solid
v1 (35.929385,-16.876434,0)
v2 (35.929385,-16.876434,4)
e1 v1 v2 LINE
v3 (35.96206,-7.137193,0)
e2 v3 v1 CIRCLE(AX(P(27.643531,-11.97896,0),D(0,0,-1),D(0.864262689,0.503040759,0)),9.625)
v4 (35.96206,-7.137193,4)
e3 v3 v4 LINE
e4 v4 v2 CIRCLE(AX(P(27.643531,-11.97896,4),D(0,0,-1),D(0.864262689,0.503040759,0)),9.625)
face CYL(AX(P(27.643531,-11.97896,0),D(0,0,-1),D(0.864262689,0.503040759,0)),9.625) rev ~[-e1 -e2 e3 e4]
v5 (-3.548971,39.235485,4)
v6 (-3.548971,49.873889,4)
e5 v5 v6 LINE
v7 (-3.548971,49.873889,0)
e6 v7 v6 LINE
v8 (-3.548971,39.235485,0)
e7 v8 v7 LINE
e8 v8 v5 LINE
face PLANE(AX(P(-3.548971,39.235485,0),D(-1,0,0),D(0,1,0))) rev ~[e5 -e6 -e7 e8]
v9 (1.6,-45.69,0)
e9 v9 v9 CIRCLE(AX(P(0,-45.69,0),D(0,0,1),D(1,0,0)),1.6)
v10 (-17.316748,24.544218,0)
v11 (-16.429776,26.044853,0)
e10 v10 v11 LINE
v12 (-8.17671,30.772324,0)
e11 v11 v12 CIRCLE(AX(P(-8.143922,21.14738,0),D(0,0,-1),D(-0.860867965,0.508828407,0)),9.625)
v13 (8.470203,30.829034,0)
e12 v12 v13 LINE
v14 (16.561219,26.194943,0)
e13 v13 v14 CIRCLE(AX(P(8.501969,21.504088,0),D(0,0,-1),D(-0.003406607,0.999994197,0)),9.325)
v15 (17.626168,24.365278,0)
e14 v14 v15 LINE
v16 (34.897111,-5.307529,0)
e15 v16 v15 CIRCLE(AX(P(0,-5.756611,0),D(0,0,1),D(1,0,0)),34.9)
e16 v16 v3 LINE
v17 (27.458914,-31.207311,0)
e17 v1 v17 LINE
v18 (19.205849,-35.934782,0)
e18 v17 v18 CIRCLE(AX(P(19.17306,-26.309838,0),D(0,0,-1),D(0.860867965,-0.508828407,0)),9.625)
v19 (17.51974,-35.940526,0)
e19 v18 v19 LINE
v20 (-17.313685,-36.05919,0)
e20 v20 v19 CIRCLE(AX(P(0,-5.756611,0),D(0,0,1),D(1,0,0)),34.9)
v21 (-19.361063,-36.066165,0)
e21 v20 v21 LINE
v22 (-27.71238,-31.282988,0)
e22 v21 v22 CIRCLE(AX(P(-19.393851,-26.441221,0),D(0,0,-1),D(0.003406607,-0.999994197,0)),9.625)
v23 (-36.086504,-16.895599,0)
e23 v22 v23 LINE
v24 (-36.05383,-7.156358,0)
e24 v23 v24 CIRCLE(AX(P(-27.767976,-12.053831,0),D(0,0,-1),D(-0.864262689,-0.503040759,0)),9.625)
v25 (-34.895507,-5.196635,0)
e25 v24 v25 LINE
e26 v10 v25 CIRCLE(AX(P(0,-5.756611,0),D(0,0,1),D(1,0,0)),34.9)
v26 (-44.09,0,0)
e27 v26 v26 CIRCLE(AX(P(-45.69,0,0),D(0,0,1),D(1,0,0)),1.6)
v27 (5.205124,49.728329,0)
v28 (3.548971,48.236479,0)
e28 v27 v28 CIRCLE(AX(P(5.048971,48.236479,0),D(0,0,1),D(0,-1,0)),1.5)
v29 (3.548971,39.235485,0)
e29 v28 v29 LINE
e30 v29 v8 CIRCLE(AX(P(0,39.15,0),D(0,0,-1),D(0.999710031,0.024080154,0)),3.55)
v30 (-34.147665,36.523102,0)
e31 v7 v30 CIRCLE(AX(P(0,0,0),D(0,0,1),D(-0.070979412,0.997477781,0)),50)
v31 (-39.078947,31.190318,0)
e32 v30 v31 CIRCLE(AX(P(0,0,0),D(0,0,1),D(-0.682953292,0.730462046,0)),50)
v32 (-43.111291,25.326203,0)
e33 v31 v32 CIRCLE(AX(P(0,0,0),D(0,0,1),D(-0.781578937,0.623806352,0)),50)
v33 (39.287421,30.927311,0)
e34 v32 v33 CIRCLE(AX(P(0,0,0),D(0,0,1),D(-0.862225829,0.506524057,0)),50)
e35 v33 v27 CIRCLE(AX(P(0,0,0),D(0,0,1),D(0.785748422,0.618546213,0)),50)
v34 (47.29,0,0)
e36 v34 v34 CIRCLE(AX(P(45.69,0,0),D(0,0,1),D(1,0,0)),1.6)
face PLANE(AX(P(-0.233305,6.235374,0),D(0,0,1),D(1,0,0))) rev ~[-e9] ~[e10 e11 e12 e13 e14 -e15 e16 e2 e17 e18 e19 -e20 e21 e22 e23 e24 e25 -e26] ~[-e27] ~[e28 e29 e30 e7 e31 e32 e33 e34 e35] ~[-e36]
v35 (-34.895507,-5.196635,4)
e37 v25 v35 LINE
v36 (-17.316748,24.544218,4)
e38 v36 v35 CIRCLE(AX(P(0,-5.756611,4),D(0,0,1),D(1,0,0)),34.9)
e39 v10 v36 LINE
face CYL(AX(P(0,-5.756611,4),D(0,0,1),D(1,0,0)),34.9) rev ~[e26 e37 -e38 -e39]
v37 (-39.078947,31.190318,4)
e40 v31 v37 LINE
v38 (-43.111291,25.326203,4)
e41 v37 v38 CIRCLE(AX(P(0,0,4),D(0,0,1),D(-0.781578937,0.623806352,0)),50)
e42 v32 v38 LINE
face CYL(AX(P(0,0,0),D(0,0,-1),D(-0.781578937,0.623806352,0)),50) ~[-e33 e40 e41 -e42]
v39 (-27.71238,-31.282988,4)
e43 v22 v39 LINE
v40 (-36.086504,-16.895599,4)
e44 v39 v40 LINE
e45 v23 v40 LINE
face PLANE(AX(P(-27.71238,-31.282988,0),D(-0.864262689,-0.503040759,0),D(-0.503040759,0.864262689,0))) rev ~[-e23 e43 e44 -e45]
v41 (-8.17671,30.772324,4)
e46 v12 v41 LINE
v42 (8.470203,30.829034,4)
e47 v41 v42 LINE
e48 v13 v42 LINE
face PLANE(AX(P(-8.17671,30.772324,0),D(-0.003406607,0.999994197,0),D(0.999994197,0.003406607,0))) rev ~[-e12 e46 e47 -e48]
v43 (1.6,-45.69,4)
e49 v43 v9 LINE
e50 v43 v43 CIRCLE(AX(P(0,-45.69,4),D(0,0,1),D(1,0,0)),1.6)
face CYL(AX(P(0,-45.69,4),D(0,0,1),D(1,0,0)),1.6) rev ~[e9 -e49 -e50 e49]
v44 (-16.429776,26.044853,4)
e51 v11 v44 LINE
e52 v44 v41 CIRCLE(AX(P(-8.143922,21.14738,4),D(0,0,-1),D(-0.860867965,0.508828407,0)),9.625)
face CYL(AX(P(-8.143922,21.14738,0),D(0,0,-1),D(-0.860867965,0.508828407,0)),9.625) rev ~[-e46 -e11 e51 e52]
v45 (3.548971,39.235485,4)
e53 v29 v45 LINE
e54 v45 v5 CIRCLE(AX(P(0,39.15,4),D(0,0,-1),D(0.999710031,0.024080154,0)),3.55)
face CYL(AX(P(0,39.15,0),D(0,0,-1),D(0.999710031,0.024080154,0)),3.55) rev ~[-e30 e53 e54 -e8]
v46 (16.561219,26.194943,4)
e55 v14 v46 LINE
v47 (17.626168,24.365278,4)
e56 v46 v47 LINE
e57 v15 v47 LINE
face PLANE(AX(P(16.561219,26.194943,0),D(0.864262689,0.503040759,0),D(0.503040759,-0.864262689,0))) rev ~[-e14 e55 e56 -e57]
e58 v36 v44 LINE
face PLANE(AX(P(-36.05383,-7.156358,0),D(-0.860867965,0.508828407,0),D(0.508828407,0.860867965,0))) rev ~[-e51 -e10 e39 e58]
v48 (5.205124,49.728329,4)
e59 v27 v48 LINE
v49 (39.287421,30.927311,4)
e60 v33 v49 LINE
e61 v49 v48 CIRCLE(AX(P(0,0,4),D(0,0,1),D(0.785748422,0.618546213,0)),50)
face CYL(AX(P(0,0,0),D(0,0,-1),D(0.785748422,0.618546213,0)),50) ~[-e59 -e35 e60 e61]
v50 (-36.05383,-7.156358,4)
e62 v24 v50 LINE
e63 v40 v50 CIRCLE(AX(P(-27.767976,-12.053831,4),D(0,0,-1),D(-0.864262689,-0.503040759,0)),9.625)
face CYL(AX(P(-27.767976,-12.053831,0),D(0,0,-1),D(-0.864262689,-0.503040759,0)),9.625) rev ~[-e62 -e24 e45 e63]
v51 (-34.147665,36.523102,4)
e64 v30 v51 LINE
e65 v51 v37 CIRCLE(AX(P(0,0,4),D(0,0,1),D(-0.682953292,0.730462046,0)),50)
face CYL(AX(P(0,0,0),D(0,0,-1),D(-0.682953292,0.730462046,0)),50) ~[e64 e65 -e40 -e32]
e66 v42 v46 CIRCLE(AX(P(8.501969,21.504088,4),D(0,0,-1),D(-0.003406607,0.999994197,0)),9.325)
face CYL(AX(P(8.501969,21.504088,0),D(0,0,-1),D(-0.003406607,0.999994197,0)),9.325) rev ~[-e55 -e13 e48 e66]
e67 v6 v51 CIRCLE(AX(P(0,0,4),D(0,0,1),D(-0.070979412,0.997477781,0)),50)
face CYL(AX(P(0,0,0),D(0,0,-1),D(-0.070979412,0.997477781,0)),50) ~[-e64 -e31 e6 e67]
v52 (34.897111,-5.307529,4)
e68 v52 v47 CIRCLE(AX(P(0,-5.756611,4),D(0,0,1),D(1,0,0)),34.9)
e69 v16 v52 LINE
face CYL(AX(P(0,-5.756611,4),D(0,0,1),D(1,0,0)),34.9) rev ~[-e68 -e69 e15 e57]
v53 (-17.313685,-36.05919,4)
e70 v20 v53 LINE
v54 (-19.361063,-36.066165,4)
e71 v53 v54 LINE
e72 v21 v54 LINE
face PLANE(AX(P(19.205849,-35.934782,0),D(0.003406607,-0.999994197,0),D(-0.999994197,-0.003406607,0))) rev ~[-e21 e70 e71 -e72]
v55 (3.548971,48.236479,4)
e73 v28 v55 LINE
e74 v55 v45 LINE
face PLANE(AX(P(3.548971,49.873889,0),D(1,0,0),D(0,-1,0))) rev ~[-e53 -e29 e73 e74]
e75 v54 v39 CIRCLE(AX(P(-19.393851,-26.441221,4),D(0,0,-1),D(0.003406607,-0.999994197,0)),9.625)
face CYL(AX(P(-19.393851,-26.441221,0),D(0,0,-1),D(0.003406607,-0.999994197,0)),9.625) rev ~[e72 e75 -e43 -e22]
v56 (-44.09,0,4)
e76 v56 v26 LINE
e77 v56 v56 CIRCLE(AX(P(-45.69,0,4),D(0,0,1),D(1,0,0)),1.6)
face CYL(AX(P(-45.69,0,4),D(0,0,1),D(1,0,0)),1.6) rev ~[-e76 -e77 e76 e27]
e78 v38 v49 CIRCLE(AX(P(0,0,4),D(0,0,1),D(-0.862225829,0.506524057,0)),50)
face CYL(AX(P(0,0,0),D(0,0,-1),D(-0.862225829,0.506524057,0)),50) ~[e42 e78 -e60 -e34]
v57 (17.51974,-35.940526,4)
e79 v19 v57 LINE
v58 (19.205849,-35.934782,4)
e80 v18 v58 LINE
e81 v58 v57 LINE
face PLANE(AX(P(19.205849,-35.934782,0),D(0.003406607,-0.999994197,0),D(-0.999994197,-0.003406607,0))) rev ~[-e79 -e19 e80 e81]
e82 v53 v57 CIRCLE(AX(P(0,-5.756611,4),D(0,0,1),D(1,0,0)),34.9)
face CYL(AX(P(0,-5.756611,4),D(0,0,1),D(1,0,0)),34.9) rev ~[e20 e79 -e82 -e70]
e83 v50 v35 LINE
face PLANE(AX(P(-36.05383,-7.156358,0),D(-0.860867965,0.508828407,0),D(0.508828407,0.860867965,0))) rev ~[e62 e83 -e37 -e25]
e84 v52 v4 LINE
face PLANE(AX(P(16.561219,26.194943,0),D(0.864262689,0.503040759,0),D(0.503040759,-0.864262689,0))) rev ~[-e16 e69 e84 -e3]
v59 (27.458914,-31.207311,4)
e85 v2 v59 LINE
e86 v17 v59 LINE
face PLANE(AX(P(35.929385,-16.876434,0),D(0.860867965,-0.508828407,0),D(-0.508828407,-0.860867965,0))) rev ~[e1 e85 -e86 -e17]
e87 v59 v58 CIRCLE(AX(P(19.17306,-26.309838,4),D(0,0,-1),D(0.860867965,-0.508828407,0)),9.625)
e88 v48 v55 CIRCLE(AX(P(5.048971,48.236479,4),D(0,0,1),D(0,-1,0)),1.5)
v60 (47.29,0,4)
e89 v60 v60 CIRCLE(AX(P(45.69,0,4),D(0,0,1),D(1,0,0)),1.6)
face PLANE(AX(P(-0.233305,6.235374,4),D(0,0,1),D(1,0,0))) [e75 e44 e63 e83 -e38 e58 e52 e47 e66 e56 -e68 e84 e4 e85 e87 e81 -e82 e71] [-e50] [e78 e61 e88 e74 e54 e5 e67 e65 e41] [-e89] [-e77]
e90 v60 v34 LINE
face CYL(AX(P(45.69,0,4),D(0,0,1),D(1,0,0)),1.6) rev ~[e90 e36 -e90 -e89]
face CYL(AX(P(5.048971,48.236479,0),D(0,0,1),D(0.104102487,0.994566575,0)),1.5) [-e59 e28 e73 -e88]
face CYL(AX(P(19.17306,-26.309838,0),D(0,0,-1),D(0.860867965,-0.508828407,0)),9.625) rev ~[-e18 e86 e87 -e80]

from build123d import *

# Parameters (mm, degrees)
F1_DEPTH = 4
F2_R     = 1.5
F3_R     = 1.6
F4_DEPTH = 4.001
F5_R     = 34.9
F6_DEPTH = 4.001


# Not quite as in the source:
# - a feature names something its author has since deleted; it is built from what else it names


with BuildPart() as f1:
    # F0 (on Top) → F1 (new body)
    with BuildSketch(Plane.XY):
        with BuildLine():
            ThreePointArc((-39.0789468534, 31.1903176135), (-41.1995846792, 28.3300939331), (-43.1112914302, 25.3262028584))
            ThreePointArc((-43.1112914302, 25.3262028584), (3.3909583102, -49.8848814947), (39.2874210825, 30.9273106604))
            ThreePointArc((39.2874210825, 30.9273106604), (23.4196994292, 44.1759853161), (3.5489706102, 49.8738890363))
            Line((3.5489706102, 49.8738890363), (3.5489706102, 39.2354845469))
            ThreePointArc((3.5489706102, 39.2354845469), (0, 35.6), (-3.5489706102, 39.2354845469))
            Line((-3.5489706102, 39.2354845469), (-3.5489706102, 49.8738890363))
            ThreePointArc((-3.5489706102, 49.8738890363), (-19.9954983208, 45.8277213802), (-34.1476646001, 36.5231023102))
            ThreePointArc((-34.1476646001, 36.5231023102), (-36.7102683781, 33.9463723482), (-39.0789468534, 31.1903176135))
        make_face()
        with BuildLine():
            Line((-36.0538297274, -7.1563580217), (-16.4297758662, 26.0448529843))
            ThreePointArc((-16.4297758662, 26.0448529843), (-12.9279784785, 29.4992312077), (-8.176710299, 30.7723237188))
            Line((-8.176710299, 30.7723237188), (8.4702026349, 30.8290335362))
            ThreePointArc((8.4702026349, 30.8290335362), (13.1364940427, 29.5958615472), (16.5612188168, 26.1949427186))
            Line((16.5612188168, 26.1949427186), (35.9620596652, -7.1371930753))
            ThreePointArc((35.9620596652, -7.1371930753), (37.2684771199, -12.0112511492), (35.9293854445, -16.8764337932))
            Line((35.9293854445, -16.8764337932), (27.4589141067, -31.2073110011))
            ThreePointArc((27.4589141067, -31.2073110011), (23.957116719, -34.6616892246), (19.2058485395, -35.9347817357))
            Line((19.2058485395, -35.9347817357), (-19.3610626759, -36.0661648035))
            ThreePointArc((-19.3610626759, -36.0661648035), (-24.1774760593, -34.793319721), (-27.7123796465, -31.2829879542))
            Line((-27.7123796465, -31.2829879542), (-36.0865039481, -16.8955987396))
            ThreePointArc((-36.0865039481, -16.8955987396), (-37.3929214028, -12.0215406656), (-36.0538297274, -7.1563580217))
        make_face(mode=Mode.SUBTRACT)
    extrude(amount=F1_DEPTH)

    # F2
    f2_edges = [f1.edges().sort_by_distance(p)[0] for p in [
        (39.287421, 30.927311, 2),
        (3.548971, 49.873889, 2),
    ]]
    fillet(f2_edges, radius=F2_R)

    # F3 (on face) → F4 (cut, through all)
    with BuildSketch(Plane.XY.offset(4)):
        with Locations((0, 45.69)):
            Circle(F3_R)
        with Locations((-45.69, 0)):
            Circle(F3_R)
        with Locations((0, -45.69)):
            Circle(F3_R)
        with Locations((45.69, 0)):
            Circle(F3_R)
    extrude(amount=-F4_DEPTH, mode=Mode.SUBTRACT)

    # F5 (on face) → F6 (cut, through all)
    with BuildSketch(Plane.XY.offset(4)):
        with Locations((0, -5.7566108276)):
            Circle(F5_R)
    extrude(amount=-F6_DEPTH, mode=Mode.SUBTRACT)


solid = f1.part
